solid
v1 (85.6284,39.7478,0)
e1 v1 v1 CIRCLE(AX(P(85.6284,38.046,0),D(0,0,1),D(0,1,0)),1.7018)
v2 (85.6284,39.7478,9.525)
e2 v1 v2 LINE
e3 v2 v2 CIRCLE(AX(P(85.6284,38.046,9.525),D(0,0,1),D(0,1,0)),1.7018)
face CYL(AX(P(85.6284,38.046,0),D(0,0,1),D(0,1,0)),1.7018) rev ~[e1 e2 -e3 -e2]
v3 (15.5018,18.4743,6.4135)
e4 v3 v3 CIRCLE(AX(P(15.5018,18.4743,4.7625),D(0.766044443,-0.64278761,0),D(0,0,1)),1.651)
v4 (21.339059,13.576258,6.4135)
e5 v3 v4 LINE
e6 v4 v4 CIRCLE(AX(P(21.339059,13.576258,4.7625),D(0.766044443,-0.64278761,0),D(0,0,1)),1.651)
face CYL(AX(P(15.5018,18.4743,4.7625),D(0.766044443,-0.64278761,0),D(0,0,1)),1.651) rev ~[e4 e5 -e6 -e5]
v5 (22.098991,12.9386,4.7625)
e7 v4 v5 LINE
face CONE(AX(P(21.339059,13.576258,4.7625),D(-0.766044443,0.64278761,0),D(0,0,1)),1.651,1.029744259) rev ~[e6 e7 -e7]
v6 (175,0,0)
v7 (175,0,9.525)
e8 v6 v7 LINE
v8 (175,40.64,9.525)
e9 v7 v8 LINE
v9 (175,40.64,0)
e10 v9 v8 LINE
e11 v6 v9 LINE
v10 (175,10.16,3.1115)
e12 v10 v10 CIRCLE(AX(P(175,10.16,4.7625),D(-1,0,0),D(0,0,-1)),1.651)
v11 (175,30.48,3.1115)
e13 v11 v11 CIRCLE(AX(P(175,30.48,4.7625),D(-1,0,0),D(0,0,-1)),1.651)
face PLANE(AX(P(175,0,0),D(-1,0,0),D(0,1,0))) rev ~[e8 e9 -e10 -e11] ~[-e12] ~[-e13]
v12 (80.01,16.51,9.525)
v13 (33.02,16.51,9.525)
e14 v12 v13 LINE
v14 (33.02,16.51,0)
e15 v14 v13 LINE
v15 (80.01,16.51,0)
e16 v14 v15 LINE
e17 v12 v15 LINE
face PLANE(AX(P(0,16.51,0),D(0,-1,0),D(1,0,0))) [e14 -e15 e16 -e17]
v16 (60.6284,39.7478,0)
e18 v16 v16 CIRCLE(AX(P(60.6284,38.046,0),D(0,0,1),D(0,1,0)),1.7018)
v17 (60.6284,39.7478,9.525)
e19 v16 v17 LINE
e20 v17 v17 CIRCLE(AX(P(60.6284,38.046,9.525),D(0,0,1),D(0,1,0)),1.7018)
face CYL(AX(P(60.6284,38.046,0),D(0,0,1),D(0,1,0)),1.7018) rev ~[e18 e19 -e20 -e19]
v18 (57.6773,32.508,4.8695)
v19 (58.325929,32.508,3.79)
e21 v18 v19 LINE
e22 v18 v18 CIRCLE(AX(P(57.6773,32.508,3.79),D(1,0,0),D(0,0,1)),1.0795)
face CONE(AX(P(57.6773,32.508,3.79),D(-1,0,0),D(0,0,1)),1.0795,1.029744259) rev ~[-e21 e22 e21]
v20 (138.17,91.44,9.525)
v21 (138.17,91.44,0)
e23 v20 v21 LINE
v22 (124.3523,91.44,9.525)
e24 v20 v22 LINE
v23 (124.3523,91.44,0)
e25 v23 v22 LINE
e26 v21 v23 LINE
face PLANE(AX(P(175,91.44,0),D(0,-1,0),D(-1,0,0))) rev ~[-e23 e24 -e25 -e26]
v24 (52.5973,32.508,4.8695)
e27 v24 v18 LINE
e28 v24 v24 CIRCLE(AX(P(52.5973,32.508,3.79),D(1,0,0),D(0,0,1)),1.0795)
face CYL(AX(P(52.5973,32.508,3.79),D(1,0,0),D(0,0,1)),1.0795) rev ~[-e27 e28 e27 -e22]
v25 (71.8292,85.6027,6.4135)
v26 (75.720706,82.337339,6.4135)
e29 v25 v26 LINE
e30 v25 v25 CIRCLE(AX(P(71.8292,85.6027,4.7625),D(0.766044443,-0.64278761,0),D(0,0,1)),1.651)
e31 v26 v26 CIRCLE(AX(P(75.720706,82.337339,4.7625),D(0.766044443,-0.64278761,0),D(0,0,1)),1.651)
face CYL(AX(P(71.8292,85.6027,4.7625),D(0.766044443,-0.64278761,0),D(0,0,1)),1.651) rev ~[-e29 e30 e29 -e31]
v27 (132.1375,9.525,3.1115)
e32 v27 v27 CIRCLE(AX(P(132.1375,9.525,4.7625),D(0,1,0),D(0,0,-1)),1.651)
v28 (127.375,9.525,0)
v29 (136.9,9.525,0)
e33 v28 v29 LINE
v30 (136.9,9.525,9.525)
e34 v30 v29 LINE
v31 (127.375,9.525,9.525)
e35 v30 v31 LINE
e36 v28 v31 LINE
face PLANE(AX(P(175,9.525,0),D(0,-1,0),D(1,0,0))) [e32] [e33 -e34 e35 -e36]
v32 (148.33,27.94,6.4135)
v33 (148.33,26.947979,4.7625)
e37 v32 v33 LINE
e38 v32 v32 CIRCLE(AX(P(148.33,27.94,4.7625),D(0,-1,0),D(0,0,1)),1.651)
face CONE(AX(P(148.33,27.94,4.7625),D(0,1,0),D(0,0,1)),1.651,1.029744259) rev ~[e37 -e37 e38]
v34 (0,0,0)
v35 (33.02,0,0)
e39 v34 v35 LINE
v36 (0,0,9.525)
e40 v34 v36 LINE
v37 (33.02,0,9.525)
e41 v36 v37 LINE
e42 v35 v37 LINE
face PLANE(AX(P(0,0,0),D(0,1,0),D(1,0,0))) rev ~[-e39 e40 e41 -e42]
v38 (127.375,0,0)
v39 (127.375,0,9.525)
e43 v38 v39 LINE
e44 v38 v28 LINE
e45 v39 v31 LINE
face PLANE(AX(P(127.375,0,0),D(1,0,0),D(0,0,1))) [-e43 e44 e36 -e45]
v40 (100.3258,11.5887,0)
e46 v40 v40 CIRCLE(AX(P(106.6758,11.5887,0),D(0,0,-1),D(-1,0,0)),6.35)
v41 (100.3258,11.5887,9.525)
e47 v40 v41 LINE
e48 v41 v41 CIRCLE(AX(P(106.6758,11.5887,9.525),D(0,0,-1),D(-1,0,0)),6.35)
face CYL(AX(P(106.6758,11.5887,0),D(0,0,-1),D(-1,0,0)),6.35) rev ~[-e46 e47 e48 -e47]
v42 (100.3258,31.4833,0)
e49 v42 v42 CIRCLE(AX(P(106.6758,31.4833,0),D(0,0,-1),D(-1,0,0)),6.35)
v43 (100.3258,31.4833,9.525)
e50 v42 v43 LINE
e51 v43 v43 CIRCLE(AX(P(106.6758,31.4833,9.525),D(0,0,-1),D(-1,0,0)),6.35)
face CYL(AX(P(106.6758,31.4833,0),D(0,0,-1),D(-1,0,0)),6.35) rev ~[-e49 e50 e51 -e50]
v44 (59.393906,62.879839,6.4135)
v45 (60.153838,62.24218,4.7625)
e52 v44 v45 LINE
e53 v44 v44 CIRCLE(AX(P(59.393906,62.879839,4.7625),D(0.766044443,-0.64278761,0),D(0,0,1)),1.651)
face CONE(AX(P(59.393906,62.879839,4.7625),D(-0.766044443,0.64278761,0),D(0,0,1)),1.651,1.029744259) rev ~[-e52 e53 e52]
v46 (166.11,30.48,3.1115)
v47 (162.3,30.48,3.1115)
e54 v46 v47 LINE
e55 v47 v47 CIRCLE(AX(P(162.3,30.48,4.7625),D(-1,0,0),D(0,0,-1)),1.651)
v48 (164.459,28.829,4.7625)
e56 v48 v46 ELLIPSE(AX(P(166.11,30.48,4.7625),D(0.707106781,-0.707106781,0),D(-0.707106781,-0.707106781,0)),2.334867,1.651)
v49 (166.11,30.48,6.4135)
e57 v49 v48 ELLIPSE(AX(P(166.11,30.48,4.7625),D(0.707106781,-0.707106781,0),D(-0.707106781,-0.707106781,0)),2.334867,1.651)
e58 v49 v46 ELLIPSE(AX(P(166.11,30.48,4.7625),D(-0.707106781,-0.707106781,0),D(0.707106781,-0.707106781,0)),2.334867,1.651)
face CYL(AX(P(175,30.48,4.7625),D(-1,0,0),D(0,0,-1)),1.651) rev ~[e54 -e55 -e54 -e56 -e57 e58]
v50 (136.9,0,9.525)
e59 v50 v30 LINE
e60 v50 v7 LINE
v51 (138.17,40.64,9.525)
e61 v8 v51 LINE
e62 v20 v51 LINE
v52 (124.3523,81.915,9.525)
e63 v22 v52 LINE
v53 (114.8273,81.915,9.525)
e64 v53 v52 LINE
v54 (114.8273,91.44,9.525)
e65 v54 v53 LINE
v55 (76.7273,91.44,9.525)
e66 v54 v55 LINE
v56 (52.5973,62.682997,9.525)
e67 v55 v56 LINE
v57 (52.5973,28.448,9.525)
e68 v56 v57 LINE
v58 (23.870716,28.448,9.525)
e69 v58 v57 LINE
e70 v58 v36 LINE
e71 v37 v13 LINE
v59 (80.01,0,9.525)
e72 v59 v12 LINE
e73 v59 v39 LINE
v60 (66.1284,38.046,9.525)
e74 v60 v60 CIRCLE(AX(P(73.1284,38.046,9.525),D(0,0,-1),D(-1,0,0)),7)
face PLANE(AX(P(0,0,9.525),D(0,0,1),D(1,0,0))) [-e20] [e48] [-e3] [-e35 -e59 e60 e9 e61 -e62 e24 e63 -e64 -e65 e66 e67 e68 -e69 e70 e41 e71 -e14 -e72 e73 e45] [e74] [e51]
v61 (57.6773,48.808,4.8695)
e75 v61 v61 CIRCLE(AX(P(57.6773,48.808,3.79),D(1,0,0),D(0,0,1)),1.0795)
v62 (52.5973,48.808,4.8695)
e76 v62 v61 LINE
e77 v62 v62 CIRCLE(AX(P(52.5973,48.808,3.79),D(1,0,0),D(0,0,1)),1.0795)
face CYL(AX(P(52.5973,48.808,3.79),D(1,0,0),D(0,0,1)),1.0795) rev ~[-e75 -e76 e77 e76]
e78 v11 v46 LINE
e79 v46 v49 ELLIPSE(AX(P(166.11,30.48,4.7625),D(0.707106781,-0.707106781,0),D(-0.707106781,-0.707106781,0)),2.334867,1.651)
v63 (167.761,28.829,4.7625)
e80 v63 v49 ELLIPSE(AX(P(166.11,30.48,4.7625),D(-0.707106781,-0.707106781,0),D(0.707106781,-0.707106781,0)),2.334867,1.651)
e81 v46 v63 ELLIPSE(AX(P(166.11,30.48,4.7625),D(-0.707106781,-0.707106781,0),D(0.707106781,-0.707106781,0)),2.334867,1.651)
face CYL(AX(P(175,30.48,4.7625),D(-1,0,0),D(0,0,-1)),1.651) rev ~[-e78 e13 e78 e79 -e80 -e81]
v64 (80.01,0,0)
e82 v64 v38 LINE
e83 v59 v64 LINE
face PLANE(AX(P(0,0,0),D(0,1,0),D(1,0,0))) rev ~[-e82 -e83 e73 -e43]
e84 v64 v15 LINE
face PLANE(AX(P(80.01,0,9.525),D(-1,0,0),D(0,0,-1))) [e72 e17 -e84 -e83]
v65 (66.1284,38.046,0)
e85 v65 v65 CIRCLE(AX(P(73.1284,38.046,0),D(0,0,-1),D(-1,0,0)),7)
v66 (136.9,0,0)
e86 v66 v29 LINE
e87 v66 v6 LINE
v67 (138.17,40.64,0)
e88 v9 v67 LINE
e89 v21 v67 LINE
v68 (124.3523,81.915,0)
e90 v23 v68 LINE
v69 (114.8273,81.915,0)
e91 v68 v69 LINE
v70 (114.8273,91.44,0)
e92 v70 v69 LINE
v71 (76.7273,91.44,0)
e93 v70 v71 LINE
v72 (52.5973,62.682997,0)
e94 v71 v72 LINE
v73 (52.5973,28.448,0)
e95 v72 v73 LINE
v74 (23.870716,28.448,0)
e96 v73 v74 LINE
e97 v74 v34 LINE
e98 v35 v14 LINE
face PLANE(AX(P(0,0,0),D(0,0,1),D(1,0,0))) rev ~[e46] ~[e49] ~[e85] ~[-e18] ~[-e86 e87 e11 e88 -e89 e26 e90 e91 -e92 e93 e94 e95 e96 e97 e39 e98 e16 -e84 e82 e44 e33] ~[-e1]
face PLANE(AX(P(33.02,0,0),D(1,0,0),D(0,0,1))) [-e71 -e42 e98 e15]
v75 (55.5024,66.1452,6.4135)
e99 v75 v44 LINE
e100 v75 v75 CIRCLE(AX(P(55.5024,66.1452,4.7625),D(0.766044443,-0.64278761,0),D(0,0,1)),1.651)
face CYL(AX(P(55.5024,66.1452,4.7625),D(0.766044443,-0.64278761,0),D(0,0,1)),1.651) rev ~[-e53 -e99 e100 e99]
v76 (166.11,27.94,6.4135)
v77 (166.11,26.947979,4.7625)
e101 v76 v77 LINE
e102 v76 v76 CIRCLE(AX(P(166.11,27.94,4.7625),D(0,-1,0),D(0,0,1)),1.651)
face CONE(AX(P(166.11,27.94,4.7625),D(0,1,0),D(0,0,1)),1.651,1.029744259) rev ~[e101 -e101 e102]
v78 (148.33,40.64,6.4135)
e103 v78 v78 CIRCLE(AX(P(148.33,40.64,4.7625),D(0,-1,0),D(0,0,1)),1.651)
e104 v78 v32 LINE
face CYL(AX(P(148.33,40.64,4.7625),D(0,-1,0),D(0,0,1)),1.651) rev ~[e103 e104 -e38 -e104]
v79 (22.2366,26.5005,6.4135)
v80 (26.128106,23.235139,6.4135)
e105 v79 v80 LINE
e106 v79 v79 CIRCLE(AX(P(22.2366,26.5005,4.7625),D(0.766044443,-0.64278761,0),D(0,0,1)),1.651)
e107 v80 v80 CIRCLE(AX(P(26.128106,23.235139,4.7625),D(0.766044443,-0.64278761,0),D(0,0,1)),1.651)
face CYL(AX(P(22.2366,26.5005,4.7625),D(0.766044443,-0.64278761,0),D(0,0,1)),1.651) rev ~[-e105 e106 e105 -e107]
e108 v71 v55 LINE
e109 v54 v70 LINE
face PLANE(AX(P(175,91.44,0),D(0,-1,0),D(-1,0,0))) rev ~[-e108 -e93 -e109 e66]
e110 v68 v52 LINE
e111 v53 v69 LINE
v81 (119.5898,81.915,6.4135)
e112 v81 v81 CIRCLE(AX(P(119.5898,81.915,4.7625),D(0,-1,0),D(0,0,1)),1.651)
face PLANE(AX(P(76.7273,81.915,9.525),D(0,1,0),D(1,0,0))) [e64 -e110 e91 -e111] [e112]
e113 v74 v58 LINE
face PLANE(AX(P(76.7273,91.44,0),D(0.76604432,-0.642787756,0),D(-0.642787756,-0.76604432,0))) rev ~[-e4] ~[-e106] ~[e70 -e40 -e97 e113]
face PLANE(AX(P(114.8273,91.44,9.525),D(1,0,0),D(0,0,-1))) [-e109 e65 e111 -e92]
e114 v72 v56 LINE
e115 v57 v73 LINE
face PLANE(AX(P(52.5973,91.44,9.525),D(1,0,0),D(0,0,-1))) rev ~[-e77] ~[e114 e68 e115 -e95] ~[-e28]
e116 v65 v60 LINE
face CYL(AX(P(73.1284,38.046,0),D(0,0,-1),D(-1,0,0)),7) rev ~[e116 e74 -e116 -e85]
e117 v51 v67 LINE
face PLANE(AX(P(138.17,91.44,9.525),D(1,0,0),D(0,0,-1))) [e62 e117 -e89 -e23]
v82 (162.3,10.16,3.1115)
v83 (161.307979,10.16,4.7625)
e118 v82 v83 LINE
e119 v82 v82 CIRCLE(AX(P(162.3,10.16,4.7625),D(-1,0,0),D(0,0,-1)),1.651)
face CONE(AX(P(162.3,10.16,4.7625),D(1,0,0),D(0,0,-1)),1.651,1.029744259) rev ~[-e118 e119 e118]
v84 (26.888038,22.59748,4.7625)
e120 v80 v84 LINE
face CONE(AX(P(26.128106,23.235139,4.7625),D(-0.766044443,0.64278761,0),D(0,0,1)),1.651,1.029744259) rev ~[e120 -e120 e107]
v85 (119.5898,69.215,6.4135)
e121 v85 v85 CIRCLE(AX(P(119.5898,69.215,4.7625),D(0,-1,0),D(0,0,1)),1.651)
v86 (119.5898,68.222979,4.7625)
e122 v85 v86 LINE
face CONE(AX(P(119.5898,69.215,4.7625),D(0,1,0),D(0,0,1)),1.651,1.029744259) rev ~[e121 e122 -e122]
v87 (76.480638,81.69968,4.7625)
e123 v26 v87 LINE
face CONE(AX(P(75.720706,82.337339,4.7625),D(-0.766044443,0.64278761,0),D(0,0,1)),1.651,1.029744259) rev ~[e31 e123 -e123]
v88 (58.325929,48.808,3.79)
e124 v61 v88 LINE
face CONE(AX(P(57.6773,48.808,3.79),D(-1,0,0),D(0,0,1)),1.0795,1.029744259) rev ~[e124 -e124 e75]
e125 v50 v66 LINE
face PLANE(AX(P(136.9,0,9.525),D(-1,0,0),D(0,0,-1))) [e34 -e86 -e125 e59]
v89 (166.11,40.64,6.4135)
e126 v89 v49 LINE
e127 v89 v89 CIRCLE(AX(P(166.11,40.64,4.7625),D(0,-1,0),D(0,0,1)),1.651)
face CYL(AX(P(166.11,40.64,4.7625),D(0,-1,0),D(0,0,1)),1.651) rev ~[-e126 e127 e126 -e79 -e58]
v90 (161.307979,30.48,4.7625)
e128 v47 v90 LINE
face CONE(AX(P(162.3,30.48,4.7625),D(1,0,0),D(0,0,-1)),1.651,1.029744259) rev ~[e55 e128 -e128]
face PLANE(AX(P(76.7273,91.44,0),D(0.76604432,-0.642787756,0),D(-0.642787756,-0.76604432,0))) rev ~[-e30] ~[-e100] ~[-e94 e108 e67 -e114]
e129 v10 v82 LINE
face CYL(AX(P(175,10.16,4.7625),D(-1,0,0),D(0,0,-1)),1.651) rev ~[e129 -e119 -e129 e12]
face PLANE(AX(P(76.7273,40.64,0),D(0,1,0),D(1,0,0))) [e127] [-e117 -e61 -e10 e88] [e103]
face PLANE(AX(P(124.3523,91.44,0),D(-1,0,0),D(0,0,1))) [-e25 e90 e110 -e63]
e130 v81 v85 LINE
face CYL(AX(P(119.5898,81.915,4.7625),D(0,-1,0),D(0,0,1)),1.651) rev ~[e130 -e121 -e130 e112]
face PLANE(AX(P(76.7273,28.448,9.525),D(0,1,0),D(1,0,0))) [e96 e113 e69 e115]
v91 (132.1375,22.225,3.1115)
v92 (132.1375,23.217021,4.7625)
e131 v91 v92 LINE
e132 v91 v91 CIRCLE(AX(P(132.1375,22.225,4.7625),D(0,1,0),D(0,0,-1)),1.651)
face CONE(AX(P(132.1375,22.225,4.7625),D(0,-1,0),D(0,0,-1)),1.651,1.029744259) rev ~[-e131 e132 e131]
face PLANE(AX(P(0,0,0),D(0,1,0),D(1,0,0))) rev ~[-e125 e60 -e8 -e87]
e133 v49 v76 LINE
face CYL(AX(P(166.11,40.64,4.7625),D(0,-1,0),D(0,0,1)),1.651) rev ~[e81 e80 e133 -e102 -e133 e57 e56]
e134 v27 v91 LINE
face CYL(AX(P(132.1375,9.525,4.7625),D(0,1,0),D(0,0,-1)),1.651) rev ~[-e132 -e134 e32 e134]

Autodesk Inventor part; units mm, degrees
ref_plane "YZ Plane" through (0, 0, 0) normal (1, 0, 0) x (0, 1, 0)
ref_plane "XZ Plane" through (0, 0, 0) normal (0, 1, 0) x (-1, 0, 0)
ref_plane "XY Plane" through (0, 0, 0) normal (0, 0, 1) x (1, 0, 0)
sketch "Sketch1" plane through (0, 0, 0) normal (0, 0, 1) x (1, 0, 0)
  line L0 (0, 0) -> (175, 0)
  line L1 (175, 0) -> (175, 91.44)
  line L2 (175, 91.44) -> (76.7273, 91.44)
  line L3 (76.7273, 91.44) -> (0, 0)
  dimension "d0" = 175
  dimension "d1" = 91.44
  dimension "d101" = 50
extrude "Extrusion1" add sketch "Sketch1" along normal blind 9.525
sketch "Sketch11" plane through (0, 0, 0) normal (0, 0, -1) x (-1, 0, 0)
  circle A0 centre (-106.6758, 11.5887) radius 6.35 projected
  circle A1 centre (-106.6758, 11.5887) radius 6.9469 projected
  dimension "d121" = 12.7
  dimension "d122" = 13.8938
sketch "Sketch8" plane through (0, 0, 0) normal (0, 0, -1) x (-1, 0, 0)
  circle A0 centre (-73.1284, 38.046) radius 7 projected
  dimension "d105" = 14
sketch "Sketch9" plane through (0, 0, 0) normal (0, 0, -1) x (-1, 0, 0)
  circle A0 centre (-85.6284, 38.046) radius 1.25 projected
  circle A1 centre (-60.6284, 38.046) radius 1.25 projected
extrude "Extrusion2" cut sketch "Sketch8" against normal blind 9.525
hole "Hole7" at (85.6284, 38.046, 0) at (60.6284, 38.046, 0) direction (0, 0, 1) diameter 3.4036 end through all clearance for "Flat Head Machine Screw" size "M3" standard "Ansi Metric M Profile"
sketch "Sketch10" plane through (0, 0, 0) normal (0, 0, -1) x (-1, 0, 0)
  circle A0 centre (-106.6758, 31.4833) radius 6.35 projected
  dimension "d118" = 12.7
extrude "Extrusion3" cut sketch "Sketch10" against normal blind 9.525
extrude "Extrusion4" cut sketch "Sketch11" against normal blind 9.525 contours A0
sketch "Sketch12" plane through (0, 0, 0) normal (0, -1, 0) x (1, 0, 0)
  line L0 (175, 9.525) -> (0, 9.525) projected
  line L1 (0, 0) -> (175, 0) projected
  line L2 (33.02, 9.525) -> (80.01, 9.525)
  line L3 (80.01, 9.525) -> (80.01, 0)
  line L4 (80.01, 0) -> (33.02, 0)
  line L5 (33.02, 0) -> (33.02, 9.525)
  line L6 (175, 0) -> (175, 9.525) projected
  dimension "d126" = 46.99
  dimension "d196" = 94.99
extrude "Extrusion5" cut sketch "Sketch12" against normal blind 16.51 contours L3 L1 L5 L0
sketch "Sketch13" plane through (76.7273, 91.44, 0) normal (0, 1, 0) x (1, 0, 0)
  line L0 (98.2727, 0) -> (0, 0) projected
  line L1 (61.4427, 0) -> (98.2727, 0)
  line L2 (98.2727, 0) -> (98.2727, -9.525)
  line L3 (98.2727, -9.525) -> (61.4427, -9.525)
  line L4 (61.4427, -9.525) -> (61.4427, 0)
  point P0 (-76.7273, 0)
  dimension "d129" = 36.83
extrude "Extrusion6" cut sketch "Sketch13" against normal blind 50.8
sketch "Sketch14" plane through (76.7273, 91.44, 9.525) normal (0, 1, 0) x (1, 0, 0)
  line L0 (0, 9.525) -> (0, 0) projected
  line L1 (-76.7273, 0) -> (0, 0) projected
  line L2 (0, 9.525) -> (0, 0) projected
  line L3 (0, 9.525) -> (-76.7273, 9.525) projected
  line L4 (-76.7273, 9.525) -> (-76.7273, 0) projected
  line L5 (-24.13, 9.525) -> (-125.73, 9.525)
  line L6 (-125.73, 9.525) -> (-125.73, 0)
  line L7 (-125.73, 0) -> (-24.13, 0)
  line L8 (-24.13, 0) -> (-24.13, 9.525)
  dimension "d132" = 24.13
  dimension "d133" = 101.6
extrude "Extrusion7" cut sketch "Sketch14" against normal blind 62.992 contours L8 L1 L4 L3 | L4 L7 L6 L5
sketch "Sketch15" plane through (76.7273, 91.44, 9.525) normal (0, 1, 0) x (1, 0, 0)
  line L0 (61.4427, 9.525) -> (0, 9.525) projected
  line L1 (0, 9.525) -> (0, 0) projected
  line L2 (0, 0) -> (61.4427, 0) projected
  line L3 (38.1, 9.525) -> (47.625, 9.525)
  line L4 (47.625, 9.525) -> (47.625, 0)
  line L5 (47.625, 0) -> (38.1, 0)
  line L6 (38.1, 0) -> (38.1, 9.525)
  point P0 (-76.7273, 9.525)
  dimension "d136" = 9.525
  dimension "d137" = 38.1
extrude "Extrusion8" cut sketch "Sketch15" against normal blind 9.525 contours L4 L2 L6 L0
sketch "Sketch16" plane through (175, 0, 0) normal (0, -1, 0) x (1, 0, 0)
  line L0 (-94.99, 0) -> (0, 0) projected
  line L1 (0, 0) -> (0, 9.525) projected
  line L2 (0, 9.525) -> (-94.99, 9.525) projected
  line L3 (-47.625, 9.525) -> (-38.1, 9.525)
  line L4 (-38.1, 9.525) -> (-38.1, 0)
  line L5 (-38.1, 0) -> (-47.625, 0)
  line L6 (-47.625, 0) -> (-47.625, 9.525)
  point P0 (-175, 0)
  dimension "d140" = 38.1
  dimension "d141" = 9.525
extrude "Extrusion9" cut sketch "Sketch16" against normal blind 9.525 contours L6 L2 L4 L0
sketch "Sketch17" plane through (76.7273, 81.915, 9.525) normal (0, 1, 0) x (1, 0, 0)
  circle A0 centre (42.8625, 4.7625) radius 2.2479 projected
  point P0 (-76.7273, 9.525)
hole "Hole8" at (119.5898, 81.915, 4.7625) direction (0, -1, 0) diameter 3.302 depth 12.7 tip angle 118 thread size "8-32 UNC" class "2B" standard "ANSI Unified Screw Threads"
sketch "Sketch18" plane through (175, 9.525, 0) normal (0, -1, 0) x (1, 0, 0)
  circle A0 centre (-42.8625, 4.7625) radius 2.2479 projected
  point P0 (-175, 0)
hole "Hole9" at (132.1375, 9.525, 4.7625) direction (0, 1, 0) diameter 3.302 depth 12.7 tip angle 118 thread size "8-32 UNC" class "2B" standard "ANSI Unified Screw Threads"
sketch "Sketch19" plane through (76.7273, 40.64, 0) normal (0, 1, 0) x (1, 0, 0)
  circle A0 centre (71.6027, -4.7625) radius 2.2479 projected
  circle A1 centre (89.3827, -4.7625) radius 2.2479 projected
  point P0 (-76.7273, 0)
hole "Hole10" at (148.33, 40.64, 4.7625) at (166.11, 40.64, 4.7625) direction (0, -1, 0) diameter 3.302 depth 12.7 tip angle 118 thread size "8-32 UNC" class "2B" standard "ANSI Unified Screw Threads"
sketch "Sketch20" plane through (175, 0, 9.525) normal (1, 0, 0) x (0, 0, -1)
  line L0 (9.525, 40.64) -> (0, 40.64) projected
  line L1 (9.525, 0) -> (0, 0) projected
  point P0 (4.7625, 10.16)
  point P1 (4.7625, 30.48)
  dimension "d165" = 30.48
  dimension "d166" = 10.16
  dimension "d167" = 10.16
hole "Hole11" at (175, 10.16, 4.7625) at (175, 30.48, 4.7625) direction (-1, 0, 0) diameter 3.302 depth 12.7 tip angle 118 thread size "8-32 UNC" class "2B" standard "ANSI Unified Screw Threads"
sketch "Sketch21" plane through (52.5973, 28.448, 0) normal (-1, 0, 0) x (0, 0, 1)
  circle A0 centre (3.79, 4.06) radius 1.0795 projected
  circle A1 centre (3.79, 4.06) radius 1.55 projected
  circle A2 centre (44.49, 20.36) radius 1.55 projected
  line L0 (46.99, 22.86) -> (46.99, 1.56) projected
  line L1 (1.29, 22.86) -> (46.99, 22.86) projected
  line L2 (1.29, 1.56) -> (1.29, 22.86) projected
  line L3 (46.99, 1.56) -> (1.29, 1.56) projected
  line L4 (1.29, 12.21) -> (46.99, 12.21)
  circle A3 centre (3.79, 20.36) radius 1.0795
  point P0 (0, -28.448)
hole "Hole12" at (52.5973, 48.808, 3.79) at (52.5973, 32.508, 3.79) direction (1, 0, 0) diameter 2.159 depth 5.08 tip angle 118
sketch "Sketch22" plane through (76.7273, 91.44, 0) normal (-0.7660444, 0.6427876, 0) x (0, 0, 1)
  circle A0 centre (4.7625, -7.62) radius 2.159 projected
  circle A1 centre (4.7625, -33.02) radius 2.159 projected
  circle A2 centre (4.7625, -84.7725) radius 2.2479 projected
  point P0 (0, -119.3664)
hole "Hole13" at (71.8292, 85.6027, 4.7625) at (55.5024, 66.1452, 4.7625) at (22.2366, 26.5005, 4.7625) direction (0.7660444, -0.6427876, 0) diameter 3.302 depth 5.08 tip angle 118 thread size "8-32 UNC" class "2B" standard "ANSI Unified Screw Threads"
sketch "Sketch23" plane through (0, 0, 0) normal (-0.7660444, 0.6427876, 0) x (0, 0, 1)
  circle A0 centre (4.7625, 24.1164) radius 2.159 projected
hole "Hole14" at (15.5018, 18.4743, 4.7625) direction (0.7660444, -0.6427876, 0) diameter 3.302 depth 7.62 tip angle 118 thread size "8-32 UNC" class "2B" standard "ANSI Unified Screw Threads"
properties part number "Inside Chassis3" material "Aluminum-6061"
